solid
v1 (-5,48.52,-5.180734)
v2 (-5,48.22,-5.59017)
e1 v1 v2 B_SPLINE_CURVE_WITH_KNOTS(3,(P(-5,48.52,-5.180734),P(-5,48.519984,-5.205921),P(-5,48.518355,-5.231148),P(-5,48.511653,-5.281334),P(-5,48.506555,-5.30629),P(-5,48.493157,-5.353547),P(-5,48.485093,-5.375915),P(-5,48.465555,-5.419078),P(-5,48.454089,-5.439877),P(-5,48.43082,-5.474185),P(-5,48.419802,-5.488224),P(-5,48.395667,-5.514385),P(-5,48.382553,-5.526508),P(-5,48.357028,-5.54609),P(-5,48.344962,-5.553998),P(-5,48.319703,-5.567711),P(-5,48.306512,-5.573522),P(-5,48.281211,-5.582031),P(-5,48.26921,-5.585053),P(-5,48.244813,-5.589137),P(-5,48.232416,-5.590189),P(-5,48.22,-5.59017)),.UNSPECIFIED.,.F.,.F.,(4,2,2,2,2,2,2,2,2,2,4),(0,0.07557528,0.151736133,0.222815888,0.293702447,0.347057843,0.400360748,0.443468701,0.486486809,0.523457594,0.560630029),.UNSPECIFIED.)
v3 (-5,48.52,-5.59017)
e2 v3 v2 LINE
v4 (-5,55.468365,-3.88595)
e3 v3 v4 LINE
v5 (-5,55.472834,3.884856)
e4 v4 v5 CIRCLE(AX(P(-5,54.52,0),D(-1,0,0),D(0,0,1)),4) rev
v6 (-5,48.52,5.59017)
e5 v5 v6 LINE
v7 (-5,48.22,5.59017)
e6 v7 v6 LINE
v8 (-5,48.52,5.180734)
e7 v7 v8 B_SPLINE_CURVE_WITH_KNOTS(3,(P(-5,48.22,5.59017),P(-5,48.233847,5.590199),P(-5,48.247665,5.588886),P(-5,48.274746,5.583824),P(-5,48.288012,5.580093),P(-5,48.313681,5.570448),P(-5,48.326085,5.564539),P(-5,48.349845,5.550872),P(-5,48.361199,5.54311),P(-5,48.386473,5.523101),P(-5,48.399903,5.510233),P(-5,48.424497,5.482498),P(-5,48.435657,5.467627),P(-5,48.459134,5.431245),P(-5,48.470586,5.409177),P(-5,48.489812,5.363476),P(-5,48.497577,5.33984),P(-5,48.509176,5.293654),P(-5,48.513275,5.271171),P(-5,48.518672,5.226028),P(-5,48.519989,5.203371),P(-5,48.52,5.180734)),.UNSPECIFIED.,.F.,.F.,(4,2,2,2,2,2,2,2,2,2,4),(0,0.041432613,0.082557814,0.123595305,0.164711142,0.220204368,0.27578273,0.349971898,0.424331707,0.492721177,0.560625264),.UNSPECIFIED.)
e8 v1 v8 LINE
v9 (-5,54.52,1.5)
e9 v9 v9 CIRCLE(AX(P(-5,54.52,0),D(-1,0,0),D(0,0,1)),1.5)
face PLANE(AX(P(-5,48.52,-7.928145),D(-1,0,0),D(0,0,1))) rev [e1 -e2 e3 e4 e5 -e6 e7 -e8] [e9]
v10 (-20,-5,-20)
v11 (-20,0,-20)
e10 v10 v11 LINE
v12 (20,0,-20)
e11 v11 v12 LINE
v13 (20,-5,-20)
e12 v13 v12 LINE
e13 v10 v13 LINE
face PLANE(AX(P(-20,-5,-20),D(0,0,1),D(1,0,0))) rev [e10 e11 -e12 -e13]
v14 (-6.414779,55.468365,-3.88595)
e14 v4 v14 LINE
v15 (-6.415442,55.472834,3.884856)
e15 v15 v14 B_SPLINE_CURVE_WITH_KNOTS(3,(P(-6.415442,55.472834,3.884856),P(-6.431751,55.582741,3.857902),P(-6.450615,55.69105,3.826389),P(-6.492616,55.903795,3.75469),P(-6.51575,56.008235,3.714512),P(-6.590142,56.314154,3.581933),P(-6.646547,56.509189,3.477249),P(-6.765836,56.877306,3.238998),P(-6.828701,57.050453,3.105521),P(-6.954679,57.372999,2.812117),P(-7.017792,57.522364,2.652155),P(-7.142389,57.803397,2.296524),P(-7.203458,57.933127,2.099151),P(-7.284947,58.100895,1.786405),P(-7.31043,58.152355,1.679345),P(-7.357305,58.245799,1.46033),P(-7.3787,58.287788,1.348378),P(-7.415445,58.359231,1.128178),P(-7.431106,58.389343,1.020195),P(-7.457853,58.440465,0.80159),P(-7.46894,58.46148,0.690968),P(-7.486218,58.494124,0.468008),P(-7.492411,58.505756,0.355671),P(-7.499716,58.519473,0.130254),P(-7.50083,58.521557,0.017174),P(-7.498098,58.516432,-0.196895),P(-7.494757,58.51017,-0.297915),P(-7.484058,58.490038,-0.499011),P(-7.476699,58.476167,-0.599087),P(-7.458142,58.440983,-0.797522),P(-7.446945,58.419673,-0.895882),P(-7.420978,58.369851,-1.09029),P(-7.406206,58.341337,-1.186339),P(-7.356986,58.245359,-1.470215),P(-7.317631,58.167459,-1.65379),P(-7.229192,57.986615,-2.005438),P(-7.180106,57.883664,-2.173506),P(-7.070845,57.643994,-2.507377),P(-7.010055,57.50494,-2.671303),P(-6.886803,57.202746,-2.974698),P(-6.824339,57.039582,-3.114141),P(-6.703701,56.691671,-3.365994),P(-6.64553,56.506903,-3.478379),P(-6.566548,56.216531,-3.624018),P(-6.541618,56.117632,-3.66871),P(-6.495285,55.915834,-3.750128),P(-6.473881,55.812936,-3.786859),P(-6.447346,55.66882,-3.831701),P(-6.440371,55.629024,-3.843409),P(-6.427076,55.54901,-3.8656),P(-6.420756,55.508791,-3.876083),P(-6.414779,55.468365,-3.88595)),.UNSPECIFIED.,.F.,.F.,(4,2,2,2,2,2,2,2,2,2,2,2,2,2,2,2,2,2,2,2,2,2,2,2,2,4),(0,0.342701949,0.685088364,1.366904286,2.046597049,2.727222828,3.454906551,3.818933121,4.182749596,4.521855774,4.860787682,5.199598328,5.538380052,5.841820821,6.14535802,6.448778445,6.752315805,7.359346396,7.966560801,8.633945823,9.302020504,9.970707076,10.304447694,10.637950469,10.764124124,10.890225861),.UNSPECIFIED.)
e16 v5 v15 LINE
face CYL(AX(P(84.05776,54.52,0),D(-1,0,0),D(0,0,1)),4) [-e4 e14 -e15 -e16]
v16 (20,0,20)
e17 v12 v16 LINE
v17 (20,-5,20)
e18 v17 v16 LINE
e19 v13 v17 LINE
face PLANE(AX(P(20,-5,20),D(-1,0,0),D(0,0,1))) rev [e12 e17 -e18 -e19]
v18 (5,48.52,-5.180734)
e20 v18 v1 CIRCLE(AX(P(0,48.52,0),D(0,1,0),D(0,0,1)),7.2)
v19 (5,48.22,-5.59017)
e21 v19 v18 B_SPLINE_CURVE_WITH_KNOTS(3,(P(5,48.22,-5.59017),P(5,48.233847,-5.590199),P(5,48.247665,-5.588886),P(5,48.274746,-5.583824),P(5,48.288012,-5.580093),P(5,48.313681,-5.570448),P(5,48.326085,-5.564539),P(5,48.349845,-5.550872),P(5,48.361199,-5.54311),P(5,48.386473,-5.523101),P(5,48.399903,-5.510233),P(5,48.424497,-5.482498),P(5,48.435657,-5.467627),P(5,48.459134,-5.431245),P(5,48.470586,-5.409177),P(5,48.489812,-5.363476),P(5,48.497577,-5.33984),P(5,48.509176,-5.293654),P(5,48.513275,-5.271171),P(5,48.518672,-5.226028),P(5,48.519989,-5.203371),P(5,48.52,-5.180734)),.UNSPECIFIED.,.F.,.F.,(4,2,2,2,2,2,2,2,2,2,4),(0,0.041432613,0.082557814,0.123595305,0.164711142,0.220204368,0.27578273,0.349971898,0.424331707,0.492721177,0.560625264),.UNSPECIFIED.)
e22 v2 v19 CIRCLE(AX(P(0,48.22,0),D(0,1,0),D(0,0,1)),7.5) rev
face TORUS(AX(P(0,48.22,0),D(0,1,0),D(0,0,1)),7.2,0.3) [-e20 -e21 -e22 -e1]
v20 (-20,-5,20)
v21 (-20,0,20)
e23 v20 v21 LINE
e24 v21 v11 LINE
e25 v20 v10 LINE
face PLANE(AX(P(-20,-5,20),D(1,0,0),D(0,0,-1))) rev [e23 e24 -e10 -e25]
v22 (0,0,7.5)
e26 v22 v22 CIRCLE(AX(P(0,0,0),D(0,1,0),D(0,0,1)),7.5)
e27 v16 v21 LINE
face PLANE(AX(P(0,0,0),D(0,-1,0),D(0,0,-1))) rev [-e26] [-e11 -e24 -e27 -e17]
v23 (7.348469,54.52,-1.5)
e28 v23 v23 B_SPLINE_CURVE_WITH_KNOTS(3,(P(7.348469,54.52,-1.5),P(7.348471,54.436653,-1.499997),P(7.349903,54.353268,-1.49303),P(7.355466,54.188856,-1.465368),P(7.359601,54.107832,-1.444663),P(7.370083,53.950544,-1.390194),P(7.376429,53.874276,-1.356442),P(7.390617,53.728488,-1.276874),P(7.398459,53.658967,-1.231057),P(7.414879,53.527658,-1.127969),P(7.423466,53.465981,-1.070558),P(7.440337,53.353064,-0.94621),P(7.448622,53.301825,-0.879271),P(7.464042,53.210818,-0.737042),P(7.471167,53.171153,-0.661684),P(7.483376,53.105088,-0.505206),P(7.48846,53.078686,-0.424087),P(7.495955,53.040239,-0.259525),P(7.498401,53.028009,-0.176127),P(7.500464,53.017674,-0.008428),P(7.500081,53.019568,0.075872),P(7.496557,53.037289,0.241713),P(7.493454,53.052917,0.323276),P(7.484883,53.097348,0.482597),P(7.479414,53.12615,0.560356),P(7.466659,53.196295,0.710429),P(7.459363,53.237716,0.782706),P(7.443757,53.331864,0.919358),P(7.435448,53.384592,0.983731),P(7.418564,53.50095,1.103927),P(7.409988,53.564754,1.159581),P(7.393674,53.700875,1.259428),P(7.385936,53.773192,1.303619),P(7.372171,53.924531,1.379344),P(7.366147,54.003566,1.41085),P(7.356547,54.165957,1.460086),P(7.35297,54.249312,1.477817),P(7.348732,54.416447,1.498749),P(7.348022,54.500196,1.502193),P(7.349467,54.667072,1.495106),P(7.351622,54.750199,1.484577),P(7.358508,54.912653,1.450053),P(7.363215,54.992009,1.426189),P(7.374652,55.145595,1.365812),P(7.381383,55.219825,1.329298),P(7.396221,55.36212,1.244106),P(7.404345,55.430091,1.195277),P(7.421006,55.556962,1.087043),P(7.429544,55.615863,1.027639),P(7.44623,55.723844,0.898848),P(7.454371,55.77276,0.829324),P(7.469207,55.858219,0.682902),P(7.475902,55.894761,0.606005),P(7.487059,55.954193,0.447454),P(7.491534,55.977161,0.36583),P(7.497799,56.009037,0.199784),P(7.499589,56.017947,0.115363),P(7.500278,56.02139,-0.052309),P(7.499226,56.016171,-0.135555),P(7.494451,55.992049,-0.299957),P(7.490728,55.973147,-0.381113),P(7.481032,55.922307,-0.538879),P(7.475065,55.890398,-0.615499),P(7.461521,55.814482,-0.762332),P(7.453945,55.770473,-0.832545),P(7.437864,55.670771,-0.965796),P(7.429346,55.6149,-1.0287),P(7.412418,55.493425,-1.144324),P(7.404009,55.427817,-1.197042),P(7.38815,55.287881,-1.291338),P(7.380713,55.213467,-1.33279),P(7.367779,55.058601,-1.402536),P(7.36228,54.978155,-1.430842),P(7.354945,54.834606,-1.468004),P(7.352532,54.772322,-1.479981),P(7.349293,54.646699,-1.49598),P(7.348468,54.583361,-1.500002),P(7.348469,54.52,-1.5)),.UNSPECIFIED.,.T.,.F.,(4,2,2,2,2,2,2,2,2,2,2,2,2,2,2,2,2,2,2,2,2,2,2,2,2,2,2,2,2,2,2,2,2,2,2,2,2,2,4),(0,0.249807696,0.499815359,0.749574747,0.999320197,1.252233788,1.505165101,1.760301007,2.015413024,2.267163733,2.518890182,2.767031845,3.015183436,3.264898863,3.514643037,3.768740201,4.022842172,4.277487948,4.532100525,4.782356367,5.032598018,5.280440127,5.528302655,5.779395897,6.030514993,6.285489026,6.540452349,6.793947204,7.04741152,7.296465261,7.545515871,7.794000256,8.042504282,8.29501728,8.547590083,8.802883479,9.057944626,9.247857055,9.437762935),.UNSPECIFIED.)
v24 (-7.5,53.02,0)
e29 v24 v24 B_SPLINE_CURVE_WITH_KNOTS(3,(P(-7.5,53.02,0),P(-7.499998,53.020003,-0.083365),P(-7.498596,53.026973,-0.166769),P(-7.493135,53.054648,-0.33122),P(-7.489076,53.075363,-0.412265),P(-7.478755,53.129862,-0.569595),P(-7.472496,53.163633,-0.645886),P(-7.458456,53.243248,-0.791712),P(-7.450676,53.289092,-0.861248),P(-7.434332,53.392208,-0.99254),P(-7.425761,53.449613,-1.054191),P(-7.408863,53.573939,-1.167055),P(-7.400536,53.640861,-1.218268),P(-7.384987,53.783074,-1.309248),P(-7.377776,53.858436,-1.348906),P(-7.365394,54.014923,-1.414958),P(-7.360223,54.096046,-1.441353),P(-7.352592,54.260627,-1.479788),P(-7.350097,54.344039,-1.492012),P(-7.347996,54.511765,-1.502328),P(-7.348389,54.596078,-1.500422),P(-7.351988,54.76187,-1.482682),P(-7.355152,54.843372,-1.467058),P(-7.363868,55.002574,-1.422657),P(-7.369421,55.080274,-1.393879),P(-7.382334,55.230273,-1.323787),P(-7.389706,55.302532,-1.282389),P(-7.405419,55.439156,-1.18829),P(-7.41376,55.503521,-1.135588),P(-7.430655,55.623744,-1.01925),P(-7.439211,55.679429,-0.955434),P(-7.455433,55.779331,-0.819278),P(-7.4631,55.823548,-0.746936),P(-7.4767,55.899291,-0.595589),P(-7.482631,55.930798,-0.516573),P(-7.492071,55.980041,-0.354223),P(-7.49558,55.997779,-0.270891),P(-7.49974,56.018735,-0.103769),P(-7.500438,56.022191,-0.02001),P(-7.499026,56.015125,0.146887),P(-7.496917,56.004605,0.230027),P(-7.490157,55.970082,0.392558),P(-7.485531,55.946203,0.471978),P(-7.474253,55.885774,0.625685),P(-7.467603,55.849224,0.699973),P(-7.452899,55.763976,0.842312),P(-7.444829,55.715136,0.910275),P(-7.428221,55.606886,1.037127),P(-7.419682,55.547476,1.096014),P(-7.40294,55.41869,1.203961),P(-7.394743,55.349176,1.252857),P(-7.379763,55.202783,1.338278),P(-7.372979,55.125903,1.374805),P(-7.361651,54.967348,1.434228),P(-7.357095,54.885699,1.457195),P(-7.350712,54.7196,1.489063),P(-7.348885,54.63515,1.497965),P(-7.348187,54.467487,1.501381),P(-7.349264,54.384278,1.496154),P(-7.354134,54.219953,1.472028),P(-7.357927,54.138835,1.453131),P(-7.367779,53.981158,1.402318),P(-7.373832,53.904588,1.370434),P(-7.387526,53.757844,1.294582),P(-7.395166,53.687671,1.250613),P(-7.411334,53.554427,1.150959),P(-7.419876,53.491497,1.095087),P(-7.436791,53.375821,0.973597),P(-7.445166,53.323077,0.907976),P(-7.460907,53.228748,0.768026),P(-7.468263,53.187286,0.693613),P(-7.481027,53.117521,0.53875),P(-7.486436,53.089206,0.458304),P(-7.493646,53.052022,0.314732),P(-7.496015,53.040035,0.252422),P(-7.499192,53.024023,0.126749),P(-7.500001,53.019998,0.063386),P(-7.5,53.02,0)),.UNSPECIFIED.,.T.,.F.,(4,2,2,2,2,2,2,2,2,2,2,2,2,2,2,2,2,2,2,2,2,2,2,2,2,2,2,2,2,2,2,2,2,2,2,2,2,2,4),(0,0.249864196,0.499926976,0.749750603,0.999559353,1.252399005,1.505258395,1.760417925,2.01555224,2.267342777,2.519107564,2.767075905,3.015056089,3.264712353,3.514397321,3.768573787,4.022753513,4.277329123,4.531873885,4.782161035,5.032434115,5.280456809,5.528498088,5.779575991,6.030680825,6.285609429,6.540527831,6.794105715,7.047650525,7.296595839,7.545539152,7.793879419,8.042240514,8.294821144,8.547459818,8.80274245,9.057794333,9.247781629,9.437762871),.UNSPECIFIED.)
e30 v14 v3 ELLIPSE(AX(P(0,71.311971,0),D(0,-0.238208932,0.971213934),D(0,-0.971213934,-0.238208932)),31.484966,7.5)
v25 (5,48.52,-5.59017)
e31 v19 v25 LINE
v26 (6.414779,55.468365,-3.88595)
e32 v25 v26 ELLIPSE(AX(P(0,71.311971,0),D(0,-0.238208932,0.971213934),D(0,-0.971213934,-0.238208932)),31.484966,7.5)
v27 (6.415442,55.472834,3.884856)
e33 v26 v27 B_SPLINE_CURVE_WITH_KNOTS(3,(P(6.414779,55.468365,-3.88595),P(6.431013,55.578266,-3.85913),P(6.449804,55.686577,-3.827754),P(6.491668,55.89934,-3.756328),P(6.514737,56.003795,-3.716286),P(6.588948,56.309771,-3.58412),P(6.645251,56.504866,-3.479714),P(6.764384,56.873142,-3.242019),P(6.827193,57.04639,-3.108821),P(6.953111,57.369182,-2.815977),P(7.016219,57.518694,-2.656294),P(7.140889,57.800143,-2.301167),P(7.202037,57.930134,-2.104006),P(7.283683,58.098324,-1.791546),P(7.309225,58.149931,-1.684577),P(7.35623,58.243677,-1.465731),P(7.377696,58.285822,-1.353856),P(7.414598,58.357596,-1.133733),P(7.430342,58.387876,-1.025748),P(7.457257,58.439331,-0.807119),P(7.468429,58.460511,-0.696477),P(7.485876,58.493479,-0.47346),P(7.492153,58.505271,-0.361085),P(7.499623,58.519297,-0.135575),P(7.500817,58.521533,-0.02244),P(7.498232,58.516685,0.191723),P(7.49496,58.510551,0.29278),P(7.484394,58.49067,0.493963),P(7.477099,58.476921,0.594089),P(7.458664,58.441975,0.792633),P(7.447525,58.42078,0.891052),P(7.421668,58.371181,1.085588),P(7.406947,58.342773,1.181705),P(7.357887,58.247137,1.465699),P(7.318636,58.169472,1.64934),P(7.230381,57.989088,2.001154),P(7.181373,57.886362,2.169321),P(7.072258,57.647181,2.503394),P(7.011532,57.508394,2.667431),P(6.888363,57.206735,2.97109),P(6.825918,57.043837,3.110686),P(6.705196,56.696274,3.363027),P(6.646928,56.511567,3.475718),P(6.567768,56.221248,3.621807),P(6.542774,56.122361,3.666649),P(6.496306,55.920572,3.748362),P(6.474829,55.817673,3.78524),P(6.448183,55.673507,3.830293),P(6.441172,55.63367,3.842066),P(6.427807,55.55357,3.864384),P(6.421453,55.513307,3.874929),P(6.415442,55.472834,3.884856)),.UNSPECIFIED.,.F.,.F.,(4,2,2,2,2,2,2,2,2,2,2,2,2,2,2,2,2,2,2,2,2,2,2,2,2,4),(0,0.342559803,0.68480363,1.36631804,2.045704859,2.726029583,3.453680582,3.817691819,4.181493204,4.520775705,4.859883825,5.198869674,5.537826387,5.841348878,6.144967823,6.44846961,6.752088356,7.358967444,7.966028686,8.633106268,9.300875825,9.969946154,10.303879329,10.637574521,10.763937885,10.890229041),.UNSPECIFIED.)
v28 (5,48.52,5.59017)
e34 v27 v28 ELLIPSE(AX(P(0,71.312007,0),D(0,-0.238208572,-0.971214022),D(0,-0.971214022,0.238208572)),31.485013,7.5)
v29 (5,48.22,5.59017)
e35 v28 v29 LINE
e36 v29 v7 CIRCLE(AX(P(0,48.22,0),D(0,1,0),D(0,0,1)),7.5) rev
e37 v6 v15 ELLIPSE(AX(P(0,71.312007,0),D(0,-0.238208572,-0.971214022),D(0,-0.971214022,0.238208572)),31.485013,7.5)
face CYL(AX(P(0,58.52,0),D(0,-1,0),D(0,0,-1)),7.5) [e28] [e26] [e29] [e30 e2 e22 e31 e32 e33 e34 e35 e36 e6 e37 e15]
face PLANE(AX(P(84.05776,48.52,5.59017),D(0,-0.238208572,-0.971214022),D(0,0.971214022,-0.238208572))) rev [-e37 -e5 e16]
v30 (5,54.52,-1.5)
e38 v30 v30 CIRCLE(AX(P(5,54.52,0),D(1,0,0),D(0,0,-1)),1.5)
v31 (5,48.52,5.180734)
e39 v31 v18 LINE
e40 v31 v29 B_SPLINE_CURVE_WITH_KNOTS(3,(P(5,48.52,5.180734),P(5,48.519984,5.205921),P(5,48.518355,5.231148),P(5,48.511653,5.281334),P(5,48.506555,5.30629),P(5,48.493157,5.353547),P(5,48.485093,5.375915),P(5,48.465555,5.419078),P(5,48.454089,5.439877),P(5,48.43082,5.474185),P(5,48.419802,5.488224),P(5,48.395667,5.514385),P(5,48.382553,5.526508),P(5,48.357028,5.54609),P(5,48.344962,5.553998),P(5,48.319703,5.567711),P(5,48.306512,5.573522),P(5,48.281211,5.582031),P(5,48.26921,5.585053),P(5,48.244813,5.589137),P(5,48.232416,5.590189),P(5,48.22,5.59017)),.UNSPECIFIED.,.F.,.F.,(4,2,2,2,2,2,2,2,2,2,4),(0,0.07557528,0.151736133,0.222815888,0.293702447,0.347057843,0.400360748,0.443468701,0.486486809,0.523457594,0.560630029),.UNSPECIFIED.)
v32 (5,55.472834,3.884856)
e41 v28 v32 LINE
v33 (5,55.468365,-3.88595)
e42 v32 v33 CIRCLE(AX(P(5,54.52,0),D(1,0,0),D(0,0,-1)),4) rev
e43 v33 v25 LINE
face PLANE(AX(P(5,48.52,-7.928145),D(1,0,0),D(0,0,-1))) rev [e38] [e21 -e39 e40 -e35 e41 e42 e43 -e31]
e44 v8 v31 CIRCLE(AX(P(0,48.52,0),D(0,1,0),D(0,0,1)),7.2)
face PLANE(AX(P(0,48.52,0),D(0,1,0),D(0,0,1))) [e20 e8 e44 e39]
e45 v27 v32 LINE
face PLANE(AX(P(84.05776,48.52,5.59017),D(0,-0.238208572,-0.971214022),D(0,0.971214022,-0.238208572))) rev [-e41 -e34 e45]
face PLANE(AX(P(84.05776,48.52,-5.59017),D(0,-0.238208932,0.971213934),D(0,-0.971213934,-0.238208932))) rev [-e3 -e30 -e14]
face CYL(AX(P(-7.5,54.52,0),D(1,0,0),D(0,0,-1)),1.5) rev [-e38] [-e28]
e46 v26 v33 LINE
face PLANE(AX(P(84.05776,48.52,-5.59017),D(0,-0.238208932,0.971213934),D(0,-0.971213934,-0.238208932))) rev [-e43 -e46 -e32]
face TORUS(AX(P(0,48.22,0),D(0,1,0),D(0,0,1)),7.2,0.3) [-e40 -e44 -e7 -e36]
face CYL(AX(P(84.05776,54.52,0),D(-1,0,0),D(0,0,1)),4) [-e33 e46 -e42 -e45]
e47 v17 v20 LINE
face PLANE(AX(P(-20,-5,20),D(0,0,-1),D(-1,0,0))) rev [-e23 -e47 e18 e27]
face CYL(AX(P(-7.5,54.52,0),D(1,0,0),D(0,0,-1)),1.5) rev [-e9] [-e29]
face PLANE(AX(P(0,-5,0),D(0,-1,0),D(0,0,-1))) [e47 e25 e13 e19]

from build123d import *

# Parameters (mm, degrees)
CROQUIS1_R                 = 7.5
SALIENTE_EXTRUIR1_DEPTH    = 58.52
CROQUIS2_W                 = 10
CROQUIS2_H                 = 15.856290926
CORTAR_EXTRUIR1_DEPTH      = 10
CORTAR_EXTRUIR2_DEPTH      = 60.473442813
CORTAR_EXTRUIR2_DEPTH_BACK = 60.473442813
CORTAR_EXTRUIR3_DEPTH      = 60.473442936
CORTAR_EXTRUIR3_DEPTH_BACK = 60.473442936
CROQUIS4_R                 = 1.5
REDONDEO1_R                = 0.3
CROQUIS6_W                 = 40
CROQUIS6_H                 = 40
SALIENTE_EXTRUIR2_DEPTH    = 5


with BuildPart() as part:
    # Croquis1 → Saliente-Extruir1 (new body)
    with BuildSketch(Plane(origin=(0, 0, 0), x_dir=(1, 0, 0), z_dir=(0, 1, 0))):
        with Locations(Location((0, 0, 0), (0, 0, 270))):
            Circle(CROQUIS1_R)
    extrude(amount=SALIENTE_EXTRUIR1_DEPTH)

    # Croquis2 → Cortar-Extruir1 (cut)
    with BuildSketch(Plane(origin=(0, 58.52, 0), x_dir=(1, 0, 0), z_dir=(0, 1, 0))):
        Rectangle(CROQUIS2_W, CROQUIS2_H)
    extrude(amount=-CORTAR_EXTRUIR1_DEPTH, mode=Mode.SUBTRACT)

    # Croquis3 → Cortar-Extruir2 (cut, two sides: drawn at the far end of the back side and taken through both)
    with BuildSketch(Plane(origin=(0, 0, 0), x_dir=(0, 0, -1), z_dir=(1, 0, 0)).offset(-CORTAR_EXTRUIR2_DEPTH_BACK)):
        with BuildLine():
            Line((-119.071460559, 48.52), (-7.5, 48.52))
            Line((-7.5, 48.52), (-5.590169944, 48.52))
            Line((-5.590169944, 48.52), (-3.884856087, 55.472834289))
            ThreePointArc((-3.884856087, 55.472834289), (0.002300645, 58.519999338), (3.885949583, 55.468364822))
            Line((3.885949583, 55.468364822), (5.590169944, 48.52))
            Line((5.590169944, 48.52), (7.5, 48.52))
            Line((7.5, 48.52), (119.071460559, 48.52))
            Line((119.071460559, 48.52), (119.071460559, 271.662921117))
            Line((119.071460559, 271.662921117), (-119.071460559, 271.662921117))
            Line((-119.071460559, 271.662921117), (-119.071460559, 48.52))
        make_face()
    extrude(amount=CORTAR_EXTRUIR2_DEPTH + CORTAR_EXTRUIR2_DEPTH_BACK, mode=Mode.SUBTRACT)

    # Croquis4 → Cortar-Extruir3 (cut, two sides: drawn at the far end of the back side and taken through both)
    with BuildSketch(Plane(origin=(0, 0, 0), x_dir=(0, 0, -1), z_dir=(1, 0, 0)).offset(-CORTAR_EXTRUIR3_DEPTH_BACK)):
        with Locations((0, 54.52)):
            Circle(CROQUIS4_R)
    extrude(amount=CORTAR_EXTRUIR3_DEPTH + CORTAR_EXTRUIR3_DEPTH_BACK, mode=Mode.SUBTRACT)

    # Redondeo1
    # the kernel refuses this fillet: 0.3 mm, written as the material it takes off along each edge
    with BuildSketch(Plane(origin=(0, 48.52, 0), x_dir=(0.7377533967735658, 0, 0.6750703115595187), z_dir=(0.6750703115595187, 0, -0.7377533967735658))) as redondeo1_piece_1_section:
        with BuildLine():
            CenterArc((7.5 - REDONDEO1_R, REDONDEO1_R), REDONDEO1_R, 270, 90)
            Line((7.5 - REDONDEO1_R, 0), (7.5, 0))
            Line((7.5, 0), (7.5, REDONDEO1_R))
        make_face()
    redondeo1_piece_1 = revolve(axis=Axis((0, 48.52, 0), (0, -1, 0)), revolution_arc=47.540389462, mode=Mode.PRIVATE)
    redondeo1_piece_1 = split(redondeo1_piece_1, bisect_by=Plane(origin=(5, 48.469281218, 5.527384127), z_dir=(-1, 0, 0)), keep=Keep.TOP, mode=Mode.PRIVATE)
    add(redondeo1_piece_1, mode=Mode.SUBTRACT)
    with BuildSketch(Plane(origin=(0, 48.52, 0), x_dir=(-0.7377709544179419, 0, -0.675051123113827), z_dir=(-0.675051123113827, 0, 0.7377709544179419))) as redondeo1_piece_2_section:
        with BuildLine():
            CenterArc((7.5 - REDONDEO1_R, REDONDEO1_R), REDONDEO1_R, 270, 90)
            Line((7.5 - REDONDEO1_R, 0), (7.5, 0))
            Line((7.5, 0), (7.5, REDONDEO1_R))
        make_face()
    redondeo1_piece_2 = revolve(axis=Axis((0, 48.52, 0), (0, -1, 0)), revolution_arc=95.083759333, mode=Mode.PRIVATE)
    redondeo1_piece_2 = split(redondeo1_piece_2, bisect_by=Plane(origin=(-5, 48.469281136, -5.527384204), z_dir=(1, 0, 0)), keep=Keep.TOP, mode=Mode.PRIVATE)
    redondeo1_piece_2 = split(redondeo1_piece_2, bisect_by=Plane(origin=(5, 48.469281136, -5.527384204), z_dir=(-1, 0, 0)), keep=Keep.TOP, mode=Mode.PRIVATE)
    add(redondeo1_piece_2, mode=Mode.SUBTRACT)
    with BuildSketch(Plane(origin=(0, 48.52, 0), x_dir=(0, 0, 1), z_dir=(1, 0, 0))) as redondeo1_piece_3_section:
        with BuildLine():
            CenterArc((7.5 - REDONDEO1_R, REDONDEO1_R), REDONDEO1_R, 270, 90)
            Line((7.5 - REDONDEO1_R, 0), (7.5, 0))
            Line((7.5, 0), (7.5, REDONDEO1_R))
        make_face()
    redondeo1_piece_3 = revolve(axis=Axis((0, 48.52, 0), (0, -1, 0)), revolution_arc=47.540389462, mode=Mode.PRIVATE)
    redondeo1_piece_3 = split(redondeo1_piece_3, bisect_by=Plane(origin=(-5, 48.435444693, 6.94366102), z_dir=(1, 0, 0)), keep=Keep.TOP, mode=Mode.PRIVATE)
    add(redondeo1_piece_3, mode=Mode.SUBTRACT)

    # Croquis6 → Saliente-Extruir2 (add)
    with BuildSketch(Plane.XZ):
        Rectangle(CROQUIS6_W, CROQUIS6_H)
    extrude(amount=SALIENTE_EXTRUIR2_DEPTH)


solid = part.part
